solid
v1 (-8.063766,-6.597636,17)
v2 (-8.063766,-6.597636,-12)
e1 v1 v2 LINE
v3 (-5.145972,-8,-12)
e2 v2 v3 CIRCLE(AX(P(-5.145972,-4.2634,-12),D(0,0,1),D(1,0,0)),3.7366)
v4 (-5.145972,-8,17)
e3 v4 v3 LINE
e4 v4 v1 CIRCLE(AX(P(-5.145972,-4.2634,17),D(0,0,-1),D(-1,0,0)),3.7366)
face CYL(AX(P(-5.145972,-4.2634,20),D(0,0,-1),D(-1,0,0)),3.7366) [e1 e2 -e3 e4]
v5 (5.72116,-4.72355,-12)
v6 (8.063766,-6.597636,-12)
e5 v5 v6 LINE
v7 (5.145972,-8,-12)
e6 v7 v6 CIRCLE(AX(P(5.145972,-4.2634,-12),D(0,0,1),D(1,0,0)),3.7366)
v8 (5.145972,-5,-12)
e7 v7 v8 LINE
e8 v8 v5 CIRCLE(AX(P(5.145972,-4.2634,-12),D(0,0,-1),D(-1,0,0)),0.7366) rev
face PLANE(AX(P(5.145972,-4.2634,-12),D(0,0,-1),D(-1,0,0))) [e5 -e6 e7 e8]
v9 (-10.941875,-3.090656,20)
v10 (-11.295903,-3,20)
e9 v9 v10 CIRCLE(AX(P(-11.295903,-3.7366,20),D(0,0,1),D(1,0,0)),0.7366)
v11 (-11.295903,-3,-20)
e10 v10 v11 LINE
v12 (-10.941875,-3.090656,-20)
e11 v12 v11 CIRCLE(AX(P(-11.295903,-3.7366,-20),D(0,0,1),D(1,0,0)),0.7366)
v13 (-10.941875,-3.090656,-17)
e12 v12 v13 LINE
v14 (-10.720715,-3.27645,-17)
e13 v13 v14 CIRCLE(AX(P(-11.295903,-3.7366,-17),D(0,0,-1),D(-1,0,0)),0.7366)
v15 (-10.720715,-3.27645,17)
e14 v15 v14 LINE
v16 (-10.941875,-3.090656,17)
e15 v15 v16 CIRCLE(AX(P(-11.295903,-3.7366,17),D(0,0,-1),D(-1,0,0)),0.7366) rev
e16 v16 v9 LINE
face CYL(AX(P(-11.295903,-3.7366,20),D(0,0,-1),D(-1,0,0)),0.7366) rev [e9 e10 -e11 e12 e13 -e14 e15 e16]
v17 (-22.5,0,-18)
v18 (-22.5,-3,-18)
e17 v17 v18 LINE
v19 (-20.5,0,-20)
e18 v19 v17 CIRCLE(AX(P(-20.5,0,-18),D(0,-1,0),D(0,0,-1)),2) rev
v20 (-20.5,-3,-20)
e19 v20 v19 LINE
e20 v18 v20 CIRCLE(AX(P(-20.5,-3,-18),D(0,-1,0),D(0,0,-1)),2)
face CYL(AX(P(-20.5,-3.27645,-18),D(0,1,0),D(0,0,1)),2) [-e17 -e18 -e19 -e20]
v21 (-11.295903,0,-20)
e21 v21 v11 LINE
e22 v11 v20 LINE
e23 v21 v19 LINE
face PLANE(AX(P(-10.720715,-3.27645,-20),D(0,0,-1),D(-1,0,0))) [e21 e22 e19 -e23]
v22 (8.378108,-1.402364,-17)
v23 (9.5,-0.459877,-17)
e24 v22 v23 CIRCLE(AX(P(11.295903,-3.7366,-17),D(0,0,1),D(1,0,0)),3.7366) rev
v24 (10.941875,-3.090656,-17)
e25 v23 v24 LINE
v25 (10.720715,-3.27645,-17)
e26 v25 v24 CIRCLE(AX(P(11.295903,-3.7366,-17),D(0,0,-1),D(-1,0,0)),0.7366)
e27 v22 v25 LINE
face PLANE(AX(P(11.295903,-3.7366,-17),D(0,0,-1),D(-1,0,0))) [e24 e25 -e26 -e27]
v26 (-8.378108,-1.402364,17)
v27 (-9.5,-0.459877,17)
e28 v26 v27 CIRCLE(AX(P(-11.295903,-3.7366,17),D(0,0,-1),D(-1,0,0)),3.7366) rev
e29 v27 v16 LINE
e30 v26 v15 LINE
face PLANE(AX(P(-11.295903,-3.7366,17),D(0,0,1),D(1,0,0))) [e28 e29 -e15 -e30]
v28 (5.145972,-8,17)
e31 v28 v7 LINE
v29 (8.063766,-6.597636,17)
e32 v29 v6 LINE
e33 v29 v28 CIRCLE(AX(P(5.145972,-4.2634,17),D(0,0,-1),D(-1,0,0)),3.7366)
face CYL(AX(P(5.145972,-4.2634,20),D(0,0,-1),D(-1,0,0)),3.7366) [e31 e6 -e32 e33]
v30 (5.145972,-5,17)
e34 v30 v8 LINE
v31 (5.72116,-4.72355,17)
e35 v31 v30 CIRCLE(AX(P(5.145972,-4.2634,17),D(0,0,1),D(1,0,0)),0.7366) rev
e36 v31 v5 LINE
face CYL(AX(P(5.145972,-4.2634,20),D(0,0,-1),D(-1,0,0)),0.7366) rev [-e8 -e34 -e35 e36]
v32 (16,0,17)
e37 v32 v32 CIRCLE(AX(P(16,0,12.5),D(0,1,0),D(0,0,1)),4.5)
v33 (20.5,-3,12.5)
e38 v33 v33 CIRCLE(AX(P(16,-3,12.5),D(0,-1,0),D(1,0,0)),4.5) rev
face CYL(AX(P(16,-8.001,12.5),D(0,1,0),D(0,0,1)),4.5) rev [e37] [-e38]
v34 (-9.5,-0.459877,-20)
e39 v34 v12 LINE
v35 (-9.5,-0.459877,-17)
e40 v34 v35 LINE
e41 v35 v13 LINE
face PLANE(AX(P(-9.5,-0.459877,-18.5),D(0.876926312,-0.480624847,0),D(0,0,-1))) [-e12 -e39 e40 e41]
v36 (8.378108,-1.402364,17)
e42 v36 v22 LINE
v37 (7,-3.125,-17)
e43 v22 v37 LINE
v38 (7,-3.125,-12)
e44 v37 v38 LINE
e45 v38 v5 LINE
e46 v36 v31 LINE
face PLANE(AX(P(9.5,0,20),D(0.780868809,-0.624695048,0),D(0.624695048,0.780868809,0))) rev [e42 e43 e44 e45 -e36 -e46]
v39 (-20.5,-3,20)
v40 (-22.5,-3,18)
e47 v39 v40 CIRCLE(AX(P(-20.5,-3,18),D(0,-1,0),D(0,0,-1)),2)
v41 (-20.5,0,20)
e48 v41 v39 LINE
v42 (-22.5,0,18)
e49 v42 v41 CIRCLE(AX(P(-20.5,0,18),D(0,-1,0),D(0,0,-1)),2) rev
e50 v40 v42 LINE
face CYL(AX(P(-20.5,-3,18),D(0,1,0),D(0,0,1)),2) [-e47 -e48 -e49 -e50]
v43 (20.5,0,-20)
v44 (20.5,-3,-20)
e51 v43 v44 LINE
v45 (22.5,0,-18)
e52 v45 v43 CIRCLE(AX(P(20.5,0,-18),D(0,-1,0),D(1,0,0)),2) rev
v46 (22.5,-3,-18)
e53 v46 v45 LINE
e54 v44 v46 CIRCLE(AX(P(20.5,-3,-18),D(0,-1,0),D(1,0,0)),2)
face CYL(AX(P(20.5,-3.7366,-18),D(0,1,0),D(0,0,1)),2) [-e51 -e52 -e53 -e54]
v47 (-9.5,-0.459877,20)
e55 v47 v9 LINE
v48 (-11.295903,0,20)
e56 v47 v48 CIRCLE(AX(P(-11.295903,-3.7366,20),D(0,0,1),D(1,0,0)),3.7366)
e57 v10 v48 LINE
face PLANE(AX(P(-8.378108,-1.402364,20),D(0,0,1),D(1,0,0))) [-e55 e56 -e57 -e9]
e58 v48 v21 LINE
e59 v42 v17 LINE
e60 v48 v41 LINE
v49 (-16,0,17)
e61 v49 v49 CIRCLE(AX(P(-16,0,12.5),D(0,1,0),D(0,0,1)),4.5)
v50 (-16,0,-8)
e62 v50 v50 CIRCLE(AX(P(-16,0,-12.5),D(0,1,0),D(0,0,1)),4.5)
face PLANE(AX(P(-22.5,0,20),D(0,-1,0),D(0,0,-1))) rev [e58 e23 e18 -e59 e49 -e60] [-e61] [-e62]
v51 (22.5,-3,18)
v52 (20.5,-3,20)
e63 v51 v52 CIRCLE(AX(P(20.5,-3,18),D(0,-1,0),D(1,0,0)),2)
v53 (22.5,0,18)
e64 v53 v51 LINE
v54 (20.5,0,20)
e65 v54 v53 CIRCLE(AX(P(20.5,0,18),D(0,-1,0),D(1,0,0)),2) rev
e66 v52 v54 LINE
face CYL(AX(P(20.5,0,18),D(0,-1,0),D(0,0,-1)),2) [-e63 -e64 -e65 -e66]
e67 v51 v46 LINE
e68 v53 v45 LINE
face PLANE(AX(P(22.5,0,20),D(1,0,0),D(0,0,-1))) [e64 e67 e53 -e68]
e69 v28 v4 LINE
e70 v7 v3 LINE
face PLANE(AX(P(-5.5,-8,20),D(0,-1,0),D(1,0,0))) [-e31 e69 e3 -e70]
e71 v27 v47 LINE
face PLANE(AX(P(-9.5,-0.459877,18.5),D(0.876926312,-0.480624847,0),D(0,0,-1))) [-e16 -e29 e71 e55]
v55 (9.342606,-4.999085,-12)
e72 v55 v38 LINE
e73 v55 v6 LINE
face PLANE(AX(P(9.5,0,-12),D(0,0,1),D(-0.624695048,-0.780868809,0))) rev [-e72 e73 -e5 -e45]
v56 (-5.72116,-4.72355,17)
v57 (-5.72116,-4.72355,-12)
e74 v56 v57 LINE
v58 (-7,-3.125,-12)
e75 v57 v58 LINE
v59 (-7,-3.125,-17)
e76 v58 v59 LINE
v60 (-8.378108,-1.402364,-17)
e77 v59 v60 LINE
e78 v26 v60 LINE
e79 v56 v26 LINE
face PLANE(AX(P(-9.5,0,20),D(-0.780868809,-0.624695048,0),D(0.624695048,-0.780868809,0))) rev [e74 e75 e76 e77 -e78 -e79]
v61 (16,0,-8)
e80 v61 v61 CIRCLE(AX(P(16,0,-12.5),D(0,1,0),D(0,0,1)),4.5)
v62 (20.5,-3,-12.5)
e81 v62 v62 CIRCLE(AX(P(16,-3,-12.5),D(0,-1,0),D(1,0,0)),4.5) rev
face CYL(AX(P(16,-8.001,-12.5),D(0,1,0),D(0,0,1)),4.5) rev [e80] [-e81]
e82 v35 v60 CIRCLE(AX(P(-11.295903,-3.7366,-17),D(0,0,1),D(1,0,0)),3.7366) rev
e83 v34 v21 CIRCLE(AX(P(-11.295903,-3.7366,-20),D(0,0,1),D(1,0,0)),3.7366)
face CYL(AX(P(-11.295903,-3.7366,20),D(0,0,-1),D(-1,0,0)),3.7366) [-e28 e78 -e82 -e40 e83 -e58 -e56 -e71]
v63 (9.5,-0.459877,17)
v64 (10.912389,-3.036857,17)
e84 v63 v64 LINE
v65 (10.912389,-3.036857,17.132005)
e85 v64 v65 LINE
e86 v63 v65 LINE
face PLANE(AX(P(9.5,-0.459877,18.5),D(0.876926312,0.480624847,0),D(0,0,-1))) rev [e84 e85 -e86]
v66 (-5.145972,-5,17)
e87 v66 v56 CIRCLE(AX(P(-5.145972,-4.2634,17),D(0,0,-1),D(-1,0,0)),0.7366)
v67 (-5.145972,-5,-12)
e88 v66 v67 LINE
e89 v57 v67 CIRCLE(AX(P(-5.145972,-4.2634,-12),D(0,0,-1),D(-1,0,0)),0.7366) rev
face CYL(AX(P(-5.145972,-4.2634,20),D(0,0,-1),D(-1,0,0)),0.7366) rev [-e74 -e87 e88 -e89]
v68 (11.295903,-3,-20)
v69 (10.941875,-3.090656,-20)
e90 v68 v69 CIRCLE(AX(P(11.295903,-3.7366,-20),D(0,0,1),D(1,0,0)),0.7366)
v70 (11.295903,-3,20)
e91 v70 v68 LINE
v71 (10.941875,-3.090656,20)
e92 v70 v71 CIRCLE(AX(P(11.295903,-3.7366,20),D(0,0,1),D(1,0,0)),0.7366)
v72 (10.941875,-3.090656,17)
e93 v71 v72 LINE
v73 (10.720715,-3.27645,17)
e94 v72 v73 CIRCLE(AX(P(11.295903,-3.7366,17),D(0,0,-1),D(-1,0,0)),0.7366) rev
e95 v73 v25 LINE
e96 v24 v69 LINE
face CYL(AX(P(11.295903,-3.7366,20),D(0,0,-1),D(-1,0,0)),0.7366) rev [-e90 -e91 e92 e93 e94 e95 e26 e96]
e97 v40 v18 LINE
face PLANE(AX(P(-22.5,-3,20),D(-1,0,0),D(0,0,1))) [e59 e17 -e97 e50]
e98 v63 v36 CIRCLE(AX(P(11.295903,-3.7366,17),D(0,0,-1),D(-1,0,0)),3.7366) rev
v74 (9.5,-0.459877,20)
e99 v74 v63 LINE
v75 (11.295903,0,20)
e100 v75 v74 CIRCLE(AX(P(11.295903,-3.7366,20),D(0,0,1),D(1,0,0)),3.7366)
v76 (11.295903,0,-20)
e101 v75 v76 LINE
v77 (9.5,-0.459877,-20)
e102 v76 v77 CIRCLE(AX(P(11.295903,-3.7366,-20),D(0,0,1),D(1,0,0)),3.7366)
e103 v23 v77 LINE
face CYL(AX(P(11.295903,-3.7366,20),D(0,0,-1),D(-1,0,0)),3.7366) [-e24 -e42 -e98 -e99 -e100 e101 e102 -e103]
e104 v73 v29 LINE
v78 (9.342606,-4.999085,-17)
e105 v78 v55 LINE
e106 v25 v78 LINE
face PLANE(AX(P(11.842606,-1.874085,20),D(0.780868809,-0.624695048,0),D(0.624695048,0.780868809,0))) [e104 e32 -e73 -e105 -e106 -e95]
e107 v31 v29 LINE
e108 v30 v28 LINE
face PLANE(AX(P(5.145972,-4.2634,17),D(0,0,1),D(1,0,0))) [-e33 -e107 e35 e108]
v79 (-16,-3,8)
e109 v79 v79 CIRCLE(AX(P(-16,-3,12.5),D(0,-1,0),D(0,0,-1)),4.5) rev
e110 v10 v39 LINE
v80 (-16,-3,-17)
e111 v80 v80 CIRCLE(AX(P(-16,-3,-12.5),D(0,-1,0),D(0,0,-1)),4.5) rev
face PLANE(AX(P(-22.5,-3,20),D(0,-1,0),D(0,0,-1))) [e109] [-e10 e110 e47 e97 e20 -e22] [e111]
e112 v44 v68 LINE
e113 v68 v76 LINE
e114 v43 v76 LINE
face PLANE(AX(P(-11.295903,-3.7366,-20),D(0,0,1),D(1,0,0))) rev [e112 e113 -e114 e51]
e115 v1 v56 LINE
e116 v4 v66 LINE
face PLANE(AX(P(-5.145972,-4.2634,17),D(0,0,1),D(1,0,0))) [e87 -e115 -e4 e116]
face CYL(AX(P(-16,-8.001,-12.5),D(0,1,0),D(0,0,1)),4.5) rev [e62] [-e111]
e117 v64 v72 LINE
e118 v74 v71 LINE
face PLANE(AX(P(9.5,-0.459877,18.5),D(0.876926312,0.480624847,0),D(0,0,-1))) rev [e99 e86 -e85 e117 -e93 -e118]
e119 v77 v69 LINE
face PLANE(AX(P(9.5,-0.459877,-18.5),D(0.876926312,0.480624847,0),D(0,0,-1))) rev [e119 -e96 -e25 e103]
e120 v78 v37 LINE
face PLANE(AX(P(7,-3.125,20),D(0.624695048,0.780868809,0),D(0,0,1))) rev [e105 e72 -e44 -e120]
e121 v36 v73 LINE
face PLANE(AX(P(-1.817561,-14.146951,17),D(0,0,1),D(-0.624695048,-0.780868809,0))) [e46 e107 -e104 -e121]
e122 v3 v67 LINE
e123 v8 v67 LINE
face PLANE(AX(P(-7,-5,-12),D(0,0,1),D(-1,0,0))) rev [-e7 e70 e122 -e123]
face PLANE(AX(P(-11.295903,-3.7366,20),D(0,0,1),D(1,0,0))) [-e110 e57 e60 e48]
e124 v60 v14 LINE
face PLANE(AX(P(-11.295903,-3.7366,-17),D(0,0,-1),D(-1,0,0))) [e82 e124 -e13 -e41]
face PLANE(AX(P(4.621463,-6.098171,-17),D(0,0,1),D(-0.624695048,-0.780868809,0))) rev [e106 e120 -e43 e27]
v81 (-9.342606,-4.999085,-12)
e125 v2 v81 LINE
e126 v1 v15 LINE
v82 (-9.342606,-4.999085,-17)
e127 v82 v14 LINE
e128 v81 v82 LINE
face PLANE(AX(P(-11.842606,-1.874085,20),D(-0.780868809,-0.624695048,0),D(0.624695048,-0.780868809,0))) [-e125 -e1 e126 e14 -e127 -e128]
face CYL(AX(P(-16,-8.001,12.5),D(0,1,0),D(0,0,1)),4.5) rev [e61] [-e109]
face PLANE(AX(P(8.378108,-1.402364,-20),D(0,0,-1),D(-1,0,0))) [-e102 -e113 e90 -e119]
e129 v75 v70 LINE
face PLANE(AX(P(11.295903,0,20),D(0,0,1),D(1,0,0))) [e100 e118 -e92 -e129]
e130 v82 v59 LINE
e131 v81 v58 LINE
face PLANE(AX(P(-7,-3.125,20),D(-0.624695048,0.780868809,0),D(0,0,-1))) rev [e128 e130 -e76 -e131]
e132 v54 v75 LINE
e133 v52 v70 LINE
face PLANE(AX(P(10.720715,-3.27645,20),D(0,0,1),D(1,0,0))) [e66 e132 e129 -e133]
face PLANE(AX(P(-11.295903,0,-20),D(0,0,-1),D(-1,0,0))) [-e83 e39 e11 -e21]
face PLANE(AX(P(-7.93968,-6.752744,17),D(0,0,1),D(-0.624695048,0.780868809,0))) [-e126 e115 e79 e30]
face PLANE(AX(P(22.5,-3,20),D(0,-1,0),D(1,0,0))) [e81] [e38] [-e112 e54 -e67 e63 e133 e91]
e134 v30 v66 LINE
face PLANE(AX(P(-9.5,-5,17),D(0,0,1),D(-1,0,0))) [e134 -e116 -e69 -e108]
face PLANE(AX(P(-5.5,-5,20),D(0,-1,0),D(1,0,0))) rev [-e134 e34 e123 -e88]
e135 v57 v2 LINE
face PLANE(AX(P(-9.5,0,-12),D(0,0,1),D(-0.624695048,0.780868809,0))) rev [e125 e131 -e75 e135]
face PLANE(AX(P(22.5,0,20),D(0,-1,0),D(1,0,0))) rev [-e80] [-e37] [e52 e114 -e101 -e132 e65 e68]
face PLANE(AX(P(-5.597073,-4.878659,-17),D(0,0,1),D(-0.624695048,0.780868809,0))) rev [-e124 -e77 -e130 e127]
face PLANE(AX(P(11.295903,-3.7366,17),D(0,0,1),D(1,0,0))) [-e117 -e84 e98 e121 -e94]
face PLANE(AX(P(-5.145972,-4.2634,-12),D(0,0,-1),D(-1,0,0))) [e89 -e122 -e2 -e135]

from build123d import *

# Parameters (mm, degrees)
BRIDA_BASE2_DEPTH       = 20
CORTAR_EXTRUIR1_START   = -20
CORTAR_EXTRUIR1_DEPTH   = 8
CORTAR_EXTRUIR1_START_2 = 17
CORTAR_EXTRUIR1_2_DEPTH = 3
CORTAR_EXTRUIR1_3_DEPTH = 3
CORTAR_EXTRUIR2_REACH   = 33.149
CROQUIS13_R             = 4.5
REDONDEO1_R             = 2


# Read off the part's stored shape, not the designer's step: Cortar-Extruir1
# Sheet-metal steps are written as plain solids
with BuildPart() as part:
    # Croquis9 → Brida base2 (new, symmetric)
    with BuildSketch(Plane.XY):
        with BuildLine():
            Line((-22.5, 0), (-11.295902805, 0))
            ThreePointArc((-11.295902805, 0), (-9.677249795, -0.368790327), (-8.378108412, -1.402364485))
            Line((-8.378108412, -1.402364485), (-5.721159702, -4.723550372))
            ThreePointArc((-5.721159702, -4.723550372), (-5.465058556, -4.927299964), (-5.145971737, -5))
            Line((-5.145971737, -5), (5.145971737, -5))
            ThreePointArc((5.145971737, -5), (5.465058556, -4.927299964), (5.721159702, -4.723550372))
            Line((5.721159702, -4.723550372), (8.378108412, -1.402364485))
            ThreePointArc((8.378108412, -1.402364485), (9.677249795, -0.368790327), (11.295902805, 0))
            Line((11.295902805, 0), (22.5, 0))
            Line((22.5, 0), (22.5, -3))
            Line((22.5, -3), (11.295902805, -3))
            ThreePointArc((11.295902805, -3), (10.976815986, -3.072700036), (10.72071484, -3.276449628))
            Line((10.72071484, -3.276449628), (8.063766131, -6.597635515))
            ThreePointArc((8.063766131, -6.597635515), (6.764624748, -7.631209673), (5.145971737, -8))
            Line((5.145971737, -8), (-5.145971737, -8))
            ThreePointArc((-5.145971737, -8), (-6.764624748, -7.631209673), (-8.063766131, -6.597635515))
            Line((-8.063766131, -6.597635515), (-10.72071484, -3.276449628))
            ThreePointArc((-10.72071484, -3.276449628), (-10.976815986, -3.072700036), (-11.295902805, -3))
            Line((-11.295902805, -3), (-22.5, -3))
            Line((-22.5, -3), (-22.5, 0))
        make_face()
    extrude(amount=BRIDA_BASE2_DEPTH, both=True)

    # Cortar-Extruir1 outline → Cortar-Extruir1 (cut)
    with BuildSketch(Plane.XY.offset(CORTAR_EXTRUIR1_START)):
        with BuildLine():
            Line((8.063766131, -6.597635515), (9.342606428, -4.999085143))
            Line((9.342606428, -4.999085143), (7, -3.125))
            Line((7, -3.125), (5.721159702, -4.723550372))
            ThreePointArc((5.721159702, -4.723550372), (5.465058556, -4.927299964), (5.145971737, -5))
            Line((5.145971737, -5), (-5.145971737, -5))
            ThreePointArc((-5.145971737, -5), (-5.465058556, -4.927299964), (-5.721159702, -4.723550372))
            Line((-5.721159702, -4.723550372), (-7, -3.125))
            Line((-7, -3.125), (-9.342606428, -4.999085143))
            Line((-9.342606428, -4.999085143), (-8.063766131, -6.597635515))
            ThreePointArc((-8.063766131, -6.597635515), (-6.764624748, -7.631209673), (-5.145971737, -8))
            Line((-5.145971737, -8), (5.145971737, -8))
            ThreePointArc((5.145971737, -8), (6.764624748, -7.631209673), (8.063766131, -6.597635515))
        make_face()
    extrude(amount=CORTAR_EXTRUIR1_DEPTH, mode=Mode.SUBTRACT)

    # Cortar-Extruir1 2 outline → Cortar-Extruir1 2 (cut)
    with BuildSketch(Plane.XY.offset(CORTAR_EXTRUIR1_START_2)):
        with BuildLine():
            Line((8.063766131, -6.597635515), (10.72071484, -3.276449628))
            ThreePointArc((10.72071484, -3.276449628), (10.82209851, -3.172606162), (10.941874542, -3.090656079))
            Line((10.941874542, -3.090656079), (9.5, -0.459877144))
            ThreePointArc((9.5, -0.459877144), (8.892404123, -0.8755908), (8.378108412, -1.402364485))
            Line((8.378108412, -1.402364485), (5.721159702, -4.723550372))
            ThreePointArc((5.721159702, -4.723550372), (5.465058556, -4.927299964), (5.145971737, -5))
            Line((5.145971737, -5), (-5.145971737, -5))
            ThreePointArc((-5.145971737, -5), (-5.465058556, -4.927299964), (-5.721159702, -4.723550372))
            Line((-5.721159702, -4.723550372), (-8.378108412, -1.402364485))
            ThreePointArc((-8.378108412, -1.402364485), (-8.892404123, -0.8755908), (-9.5, -0.459877144))
            Line((-9.5, -0.459877144), (-10.941874542, -3.090656079))
            ThreePointArc((-10.941874542, -3.090656079), (-10.82209851, -3.172606162), (-10.72071484, -3.276449628))
            Line((-10.72071484, -3.276449628), (-8.063766131, -6.597635515))
            ThreePointArc((-8.063766131, -6.597635515), (-6.764624748, -7.631209673), (-5.145971737, -8))
            Line((-5.145971737, -8), (5.145971737, -8))
            ThreePointArc((5.145971737, -8), (6.764624748, -7.631209673), (8.063766131, -6.597635515))
        make_face()
    extrude(amount=CORTAR_EXTRUIR1_2_DEPTH, mode=Mode.SUBTRACT)

    # Cortar-Extruir1 3 outline → Cortar-Extruir1 3 (cut)
    with BuildSketch(Plane.XY.offset(CORTAR_EXTRUIR1_START)):
        with BuildLine():
            Line((7, -3.125), (9.342606428, -4.999085143))
            Line((9.342606428, -4.999085143), (10.72071484, -3.276449628))
            ThreePointArc((10.72071484, -3.276449628), (10.82209851, -3.172606162), (10.941874542, -3.090656079))
            Line((10.941874542, -3.090656079), (9.5, -0.459877144))
            ThreePointArc((9.5, -0.459877144), (8.892404123, -0.8755908), (8.378108412, -1.402364485))
            Line((8.378108412, -1.402364485), (7, -3.125))
        make_face()
        with BuildLine():
            Line((-10.72071484, -3.276449628), (-9.342606428, -4.999085143))
            Line((-9.342606428, -4.999085143), (-7, -3.125))
            Line((-7, -3.125), (-8.378108412, -1.402364485))
            ThreePointArc((-8.378108412, -1.402364485), (-8.892404123, -0.8755908), (-9.5, -0.459877144))
            Line((-9.5, -0.459877144), (-10.941874542, -3.090656079))
            ThreePointArc((-10.941874542, -3.090656079), (-10.82209851, -3.172606162), (-10.72071484, -3.276449628))
        make_face()
    extrude(amount=CORTAR_EXTRUIR1_3_DEPTH, mode=Mode.SUBTRACT)

    # Croquis13 → Cortar-Extruir2 (cut, up to next)
    with BuildSketch(Plane(origin=(0, 0, 0), x_dir=(1, 0, 0), z_dir=(0, 1, 0)), mode=Mode.PRIVATE) as cortar_extruir2_sk1:
        with Locations(Location((-16, 12.5, 0), (0, 0, 270))):
            Circle(CROQUIS13_R)
    cortar_extruir2_tool1 = extrude(cortar_extruir2_sk1.sketch, amount=-CORTAR_EXTRUIR2_REACH, mode=Mode.PRIVATE) & part.part
    # Croquis13 → Cortar-Extruir2 (cut, up to next)
    with BuildSketch(Plane(origin=(0, 0, 0), x_dir=(1, 0, 0), z_dir=(0, 1, 0)), mode=Mode.PRIVATE) as cortar_extruir2_sk2:
        with Locations(Location((16, 12.5, 0), (0, 0, 270))):
            Circle(CROQUIS13_R)
    cortar_extruir2_tool2 = extrude(cortar_extruir2_sk2.sketch, amount=-CORTAR_EXTRUIR2_REACH, mode=Mode.PRIVATE) & part.part
    # Croquis13 → Cortar-Extruir2 (cut, up to next)
    with BuildSketch(Plane(origin=(0, 0, 0), x_dir=(1, 0, 0), z_dir=(0, 1, 0)), mode=Mode.PRIVATE) as cortar_extruir2_sk3:
        with Locations(Location((16, -12.5, 0), (0, 0, 270))):
            Circle(CROQUIS13_R)
    cortar_extruir2_tool3 = extrude(cortar_extruir2_sk3.sketch, amount=-CORTAR_EXTRUIR2_REACH, mode=Mode.PRIVATE) & part.part
    # Croquis13 → Cortar-Extruir2 (cut, up to next)
    with BuildSketch(Plane(origin=(0, 0, 0), x_dir=(1, 0, 0), z_dir=(0, 1, 0)), mode=Mode.PRIVATE) as cortar_extruir2_sk4:
        with Locations(Location((-16, -12.5, 0), (0, 0, 270))):
            Circle(CROQUIS13_R)
    cortar_extruir2_tool4 = extrude(cortar_extruir2_sk4.sketch, amount=-CORTAR_EXTRUIR2_REACH, mode=Mode.PRIVATE) & part.part
    add(cortar_extruir2_tool1.solids().sort_by_distance((-16, 0, -12.5))[0], mode=Mode.SUBTRACT)
    add(cortar_extruir2_tool2.solids().sort_by_distance((16, 0, -12.5))[0], mode=Mode.SUBTRACT)
    add(cortar_extruir2_tool3.solids().sort_by_distance((16, 0, 12.5))[0], mode=Mode.SUBTRACT)
    add(cortar_extruir2_tool4.solids().sort_by_distance((-16, 0, 12.5))[0], mode=Mode.SUBTRACT)

    # Redondeo1
    redondeo1_edges = [part.edges().sort_by_distance(p)[0] for p in [
        (22.5, -1.5, -20),
        (-22.5, -1.5, -20),
        (22.5, -1.5, 20),
        (-22.5, -1.5, 20),
    ]]
    fillet(redondeo1_edges, radius=REDONDEO1_R)


solid = part.part
